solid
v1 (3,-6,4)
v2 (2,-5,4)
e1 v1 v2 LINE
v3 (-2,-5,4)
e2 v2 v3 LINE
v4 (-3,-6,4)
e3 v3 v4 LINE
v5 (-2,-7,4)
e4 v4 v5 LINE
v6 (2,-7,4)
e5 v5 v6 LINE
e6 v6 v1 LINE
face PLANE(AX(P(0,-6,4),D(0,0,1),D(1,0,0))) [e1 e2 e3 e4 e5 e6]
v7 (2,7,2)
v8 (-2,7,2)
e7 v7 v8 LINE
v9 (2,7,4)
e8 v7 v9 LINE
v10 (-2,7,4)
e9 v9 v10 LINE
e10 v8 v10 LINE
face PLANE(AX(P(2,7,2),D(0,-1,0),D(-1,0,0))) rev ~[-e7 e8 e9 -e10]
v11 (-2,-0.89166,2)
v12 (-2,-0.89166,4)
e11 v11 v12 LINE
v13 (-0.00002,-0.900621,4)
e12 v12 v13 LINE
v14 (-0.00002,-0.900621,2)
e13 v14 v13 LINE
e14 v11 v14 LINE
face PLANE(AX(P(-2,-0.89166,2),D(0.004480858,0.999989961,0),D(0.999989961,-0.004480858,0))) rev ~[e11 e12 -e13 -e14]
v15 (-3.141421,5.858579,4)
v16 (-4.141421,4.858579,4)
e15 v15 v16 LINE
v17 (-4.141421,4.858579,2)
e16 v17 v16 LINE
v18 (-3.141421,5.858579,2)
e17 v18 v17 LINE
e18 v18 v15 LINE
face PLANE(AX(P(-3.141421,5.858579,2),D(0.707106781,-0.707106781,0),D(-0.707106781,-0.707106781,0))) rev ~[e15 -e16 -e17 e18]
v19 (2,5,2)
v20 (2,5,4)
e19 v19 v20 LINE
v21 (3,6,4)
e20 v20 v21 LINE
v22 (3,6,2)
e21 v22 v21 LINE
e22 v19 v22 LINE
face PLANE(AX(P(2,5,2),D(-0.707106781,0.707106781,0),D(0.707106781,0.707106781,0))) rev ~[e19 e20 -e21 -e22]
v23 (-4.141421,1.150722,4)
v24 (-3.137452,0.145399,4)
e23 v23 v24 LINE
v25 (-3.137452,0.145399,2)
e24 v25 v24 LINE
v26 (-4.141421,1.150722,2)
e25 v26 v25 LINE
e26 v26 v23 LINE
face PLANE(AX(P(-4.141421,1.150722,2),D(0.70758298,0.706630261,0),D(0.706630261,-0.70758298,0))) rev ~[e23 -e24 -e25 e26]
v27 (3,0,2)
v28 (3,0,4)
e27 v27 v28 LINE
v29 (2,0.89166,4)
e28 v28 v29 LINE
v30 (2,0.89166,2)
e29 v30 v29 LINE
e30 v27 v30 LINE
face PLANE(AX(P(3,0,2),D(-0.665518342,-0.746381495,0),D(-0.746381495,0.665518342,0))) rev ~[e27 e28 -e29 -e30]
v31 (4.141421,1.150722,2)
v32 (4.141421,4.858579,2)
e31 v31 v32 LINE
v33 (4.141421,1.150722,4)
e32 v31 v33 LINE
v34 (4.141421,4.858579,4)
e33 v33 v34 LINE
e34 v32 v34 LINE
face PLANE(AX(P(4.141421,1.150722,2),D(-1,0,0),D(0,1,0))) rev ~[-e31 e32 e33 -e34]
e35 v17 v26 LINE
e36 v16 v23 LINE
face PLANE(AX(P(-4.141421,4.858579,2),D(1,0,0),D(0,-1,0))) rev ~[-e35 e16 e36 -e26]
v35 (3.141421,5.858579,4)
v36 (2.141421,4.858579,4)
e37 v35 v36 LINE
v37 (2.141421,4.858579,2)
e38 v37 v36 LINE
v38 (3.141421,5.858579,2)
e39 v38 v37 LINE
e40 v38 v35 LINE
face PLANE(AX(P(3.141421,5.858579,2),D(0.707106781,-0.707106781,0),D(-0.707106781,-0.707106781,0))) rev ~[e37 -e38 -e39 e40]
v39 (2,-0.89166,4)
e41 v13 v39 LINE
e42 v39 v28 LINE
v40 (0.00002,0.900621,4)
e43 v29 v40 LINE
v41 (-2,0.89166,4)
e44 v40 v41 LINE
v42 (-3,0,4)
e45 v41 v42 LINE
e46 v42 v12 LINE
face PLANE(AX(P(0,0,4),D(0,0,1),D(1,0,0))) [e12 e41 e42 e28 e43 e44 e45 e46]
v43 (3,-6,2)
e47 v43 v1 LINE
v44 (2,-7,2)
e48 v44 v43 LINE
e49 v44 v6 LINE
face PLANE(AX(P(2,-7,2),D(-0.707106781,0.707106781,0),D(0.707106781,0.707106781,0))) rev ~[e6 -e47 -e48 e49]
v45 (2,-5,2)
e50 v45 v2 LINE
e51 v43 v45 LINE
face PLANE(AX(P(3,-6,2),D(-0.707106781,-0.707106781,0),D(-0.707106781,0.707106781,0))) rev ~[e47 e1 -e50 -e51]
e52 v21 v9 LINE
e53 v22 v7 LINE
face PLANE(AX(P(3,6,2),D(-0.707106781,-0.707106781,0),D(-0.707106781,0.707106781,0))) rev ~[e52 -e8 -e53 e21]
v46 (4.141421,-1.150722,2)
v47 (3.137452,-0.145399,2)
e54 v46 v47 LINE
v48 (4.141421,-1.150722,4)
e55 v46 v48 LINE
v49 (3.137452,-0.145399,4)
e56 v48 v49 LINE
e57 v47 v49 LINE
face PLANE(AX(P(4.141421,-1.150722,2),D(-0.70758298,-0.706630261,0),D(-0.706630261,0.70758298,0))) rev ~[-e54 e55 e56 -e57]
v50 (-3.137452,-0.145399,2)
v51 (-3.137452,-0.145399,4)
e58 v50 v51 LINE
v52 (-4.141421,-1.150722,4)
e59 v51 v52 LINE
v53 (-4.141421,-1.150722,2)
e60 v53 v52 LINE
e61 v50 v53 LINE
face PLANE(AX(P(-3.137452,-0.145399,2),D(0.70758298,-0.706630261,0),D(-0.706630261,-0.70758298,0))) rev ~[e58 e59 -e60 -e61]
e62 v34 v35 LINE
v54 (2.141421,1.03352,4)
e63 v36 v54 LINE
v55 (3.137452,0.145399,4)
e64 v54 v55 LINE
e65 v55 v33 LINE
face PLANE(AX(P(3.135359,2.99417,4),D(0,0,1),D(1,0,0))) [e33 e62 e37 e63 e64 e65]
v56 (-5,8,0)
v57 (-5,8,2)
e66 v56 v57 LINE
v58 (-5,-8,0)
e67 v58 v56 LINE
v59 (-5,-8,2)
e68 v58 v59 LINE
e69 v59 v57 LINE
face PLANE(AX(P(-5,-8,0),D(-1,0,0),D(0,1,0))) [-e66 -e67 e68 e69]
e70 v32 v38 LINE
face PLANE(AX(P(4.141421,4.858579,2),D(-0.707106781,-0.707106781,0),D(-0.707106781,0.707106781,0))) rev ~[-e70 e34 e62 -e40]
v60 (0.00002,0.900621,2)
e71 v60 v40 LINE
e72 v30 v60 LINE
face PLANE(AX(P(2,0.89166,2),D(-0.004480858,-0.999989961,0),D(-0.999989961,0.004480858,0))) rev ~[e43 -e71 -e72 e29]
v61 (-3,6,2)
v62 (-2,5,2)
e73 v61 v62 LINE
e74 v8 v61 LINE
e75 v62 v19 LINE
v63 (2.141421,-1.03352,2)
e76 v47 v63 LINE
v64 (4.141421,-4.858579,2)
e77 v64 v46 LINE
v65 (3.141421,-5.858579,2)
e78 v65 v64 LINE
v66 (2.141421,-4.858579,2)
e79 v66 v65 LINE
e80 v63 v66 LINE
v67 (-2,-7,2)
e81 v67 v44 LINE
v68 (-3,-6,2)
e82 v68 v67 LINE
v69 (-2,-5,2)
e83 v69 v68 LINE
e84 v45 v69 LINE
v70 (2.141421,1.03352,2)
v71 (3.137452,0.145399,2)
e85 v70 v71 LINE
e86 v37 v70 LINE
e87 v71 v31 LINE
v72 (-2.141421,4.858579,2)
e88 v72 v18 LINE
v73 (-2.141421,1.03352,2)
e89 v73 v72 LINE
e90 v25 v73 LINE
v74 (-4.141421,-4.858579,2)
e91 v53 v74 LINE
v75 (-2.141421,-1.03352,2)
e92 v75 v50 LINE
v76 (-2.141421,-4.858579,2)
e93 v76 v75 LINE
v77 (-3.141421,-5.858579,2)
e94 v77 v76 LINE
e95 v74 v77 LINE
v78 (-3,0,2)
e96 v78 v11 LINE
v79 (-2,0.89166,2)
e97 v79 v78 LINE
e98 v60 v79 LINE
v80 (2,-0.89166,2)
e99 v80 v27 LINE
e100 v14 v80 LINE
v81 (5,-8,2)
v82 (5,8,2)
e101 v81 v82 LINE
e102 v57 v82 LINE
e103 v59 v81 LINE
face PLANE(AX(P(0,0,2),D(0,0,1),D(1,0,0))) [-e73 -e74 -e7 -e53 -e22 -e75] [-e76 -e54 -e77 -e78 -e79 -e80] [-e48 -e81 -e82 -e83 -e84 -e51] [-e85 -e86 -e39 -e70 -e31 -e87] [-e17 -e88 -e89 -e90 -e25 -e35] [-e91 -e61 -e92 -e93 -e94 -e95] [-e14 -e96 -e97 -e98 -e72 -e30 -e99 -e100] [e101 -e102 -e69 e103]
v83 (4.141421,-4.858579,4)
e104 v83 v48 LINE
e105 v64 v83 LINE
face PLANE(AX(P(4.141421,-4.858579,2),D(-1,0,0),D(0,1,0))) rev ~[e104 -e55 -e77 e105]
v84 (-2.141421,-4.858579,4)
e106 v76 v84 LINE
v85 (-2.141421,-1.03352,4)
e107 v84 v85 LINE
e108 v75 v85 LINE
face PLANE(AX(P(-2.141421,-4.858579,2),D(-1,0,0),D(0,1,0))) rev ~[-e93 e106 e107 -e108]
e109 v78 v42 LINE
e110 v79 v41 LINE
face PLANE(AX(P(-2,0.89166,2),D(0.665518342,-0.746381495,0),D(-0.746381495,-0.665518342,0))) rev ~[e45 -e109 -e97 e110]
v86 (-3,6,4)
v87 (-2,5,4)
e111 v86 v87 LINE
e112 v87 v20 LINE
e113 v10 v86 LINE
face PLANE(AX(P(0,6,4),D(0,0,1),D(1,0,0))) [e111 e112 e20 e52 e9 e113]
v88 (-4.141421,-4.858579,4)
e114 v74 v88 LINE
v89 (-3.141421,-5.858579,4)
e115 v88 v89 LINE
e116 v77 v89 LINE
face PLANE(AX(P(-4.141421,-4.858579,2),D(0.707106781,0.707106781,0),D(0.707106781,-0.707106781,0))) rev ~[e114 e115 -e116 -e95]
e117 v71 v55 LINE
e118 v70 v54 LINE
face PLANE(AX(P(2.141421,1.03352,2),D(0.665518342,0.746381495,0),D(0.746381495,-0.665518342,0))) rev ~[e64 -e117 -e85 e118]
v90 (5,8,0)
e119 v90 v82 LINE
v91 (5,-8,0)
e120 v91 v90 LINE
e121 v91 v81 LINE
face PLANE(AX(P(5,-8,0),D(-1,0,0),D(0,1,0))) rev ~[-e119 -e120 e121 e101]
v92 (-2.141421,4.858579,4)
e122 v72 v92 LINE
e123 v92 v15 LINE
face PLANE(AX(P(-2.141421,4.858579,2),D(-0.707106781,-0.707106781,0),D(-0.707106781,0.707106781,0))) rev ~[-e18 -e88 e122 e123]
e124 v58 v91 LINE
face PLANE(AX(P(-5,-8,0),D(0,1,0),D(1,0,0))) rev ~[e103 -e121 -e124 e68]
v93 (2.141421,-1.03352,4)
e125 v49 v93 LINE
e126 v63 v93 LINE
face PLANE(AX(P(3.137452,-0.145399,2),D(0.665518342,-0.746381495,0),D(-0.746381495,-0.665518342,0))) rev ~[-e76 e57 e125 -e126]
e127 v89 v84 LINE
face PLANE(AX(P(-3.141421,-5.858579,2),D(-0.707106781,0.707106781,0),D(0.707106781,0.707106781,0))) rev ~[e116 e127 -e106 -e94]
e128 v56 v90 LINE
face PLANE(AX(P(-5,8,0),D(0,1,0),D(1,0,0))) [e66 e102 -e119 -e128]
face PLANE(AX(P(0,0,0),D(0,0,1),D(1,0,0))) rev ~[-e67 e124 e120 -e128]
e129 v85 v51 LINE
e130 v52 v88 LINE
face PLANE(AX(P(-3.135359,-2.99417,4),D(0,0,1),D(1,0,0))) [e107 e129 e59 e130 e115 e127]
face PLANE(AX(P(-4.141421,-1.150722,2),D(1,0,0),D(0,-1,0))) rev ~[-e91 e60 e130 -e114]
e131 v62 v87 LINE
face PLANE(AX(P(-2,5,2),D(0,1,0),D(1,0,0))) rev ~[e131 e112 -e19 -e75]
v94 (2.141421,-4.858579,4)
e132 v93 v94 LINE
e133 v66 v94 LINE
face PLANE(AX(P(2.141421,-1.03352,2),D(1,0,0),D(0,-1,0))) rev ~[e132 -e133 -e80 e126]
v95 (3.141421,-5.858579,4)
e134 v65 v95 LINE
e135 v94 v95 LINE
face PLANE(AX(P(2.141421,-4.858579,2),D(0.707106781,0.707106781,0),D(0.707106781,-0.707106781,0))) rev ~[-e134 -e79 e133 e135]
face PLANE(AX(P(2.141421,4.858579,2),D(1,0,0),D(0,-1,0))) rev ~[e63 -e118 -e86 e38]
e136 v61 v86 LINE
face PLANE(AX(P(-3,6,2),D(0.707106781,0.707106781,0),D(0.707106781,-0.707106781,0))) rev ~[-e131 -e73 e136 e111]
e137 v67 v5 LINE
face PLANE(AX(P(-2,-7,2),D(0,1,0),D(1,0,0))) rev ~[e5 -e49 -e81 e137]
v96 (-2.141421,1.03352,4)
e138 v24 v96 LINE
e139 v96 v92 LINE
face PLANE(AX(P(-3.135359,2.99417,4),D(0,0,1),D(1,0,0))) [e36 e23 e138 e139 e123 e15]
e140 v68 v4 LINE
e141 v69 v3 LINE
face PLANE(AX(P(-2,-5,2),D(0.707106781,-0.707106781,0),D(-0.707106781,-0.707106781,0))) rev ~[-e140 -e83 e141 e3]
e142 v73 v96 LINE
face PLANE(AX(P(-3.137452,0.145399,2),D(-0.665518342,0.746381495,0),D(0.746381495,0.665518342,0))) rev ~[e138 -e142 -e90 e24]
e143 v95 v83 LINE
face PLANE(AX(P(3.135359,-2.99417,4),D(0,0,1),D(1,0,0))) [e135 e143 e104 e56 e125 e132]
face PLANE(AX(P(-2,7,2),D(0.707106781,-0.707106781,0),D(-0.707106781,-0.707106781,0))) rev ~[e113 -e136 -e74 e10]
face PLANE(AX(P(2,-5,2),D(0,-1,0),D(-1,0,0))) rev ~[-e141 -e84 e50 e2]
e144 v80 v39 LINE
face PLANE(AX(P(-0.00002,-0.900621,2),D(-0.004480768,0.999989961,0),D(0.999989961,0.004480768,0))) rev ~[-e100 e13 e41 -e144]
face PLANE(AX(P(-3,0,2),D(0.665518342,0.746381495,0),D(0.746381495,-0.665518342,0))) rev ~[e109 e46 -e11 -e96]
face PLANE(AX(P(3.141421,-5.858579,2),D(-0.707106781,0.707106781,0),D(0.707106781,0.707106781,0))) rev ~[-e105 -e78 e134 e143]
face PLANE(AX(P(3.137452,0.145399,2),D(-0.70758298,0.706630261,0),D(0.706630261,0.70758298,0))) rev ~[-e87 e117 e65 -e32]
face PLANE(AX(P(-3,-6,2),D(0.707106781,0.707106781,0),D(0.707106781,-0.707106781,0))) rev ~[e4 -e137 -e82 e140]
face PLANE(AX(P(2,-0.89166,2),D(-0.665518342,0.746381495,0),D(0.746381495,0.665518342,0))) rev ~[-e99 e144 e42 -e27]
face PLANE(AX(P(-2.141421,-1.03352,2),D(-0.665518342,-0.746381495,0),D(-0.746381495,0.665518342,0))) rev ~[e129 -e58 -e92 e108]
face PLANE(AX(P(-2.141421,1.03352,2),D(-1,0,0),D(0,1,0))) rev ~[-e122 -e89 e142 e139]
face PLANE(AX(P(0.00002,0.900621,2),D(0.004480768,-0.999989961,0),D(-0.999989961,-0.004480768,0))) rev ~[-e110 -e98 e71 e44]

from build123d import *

# Parameters (mm, degrees)
F0_W     = 10
F0_H     = 16
F1_DEPTH = 2
F3_DEPTH = 2


# Not quite as in the source:
# - ends of sketch curves that miss each other by under 0.0002 mm in the source are joined


with BuildPart() as f1:
    # F0 (on Top) → F1 (new body)
    with BuildSketch(Plane.XY):
        Rectangle(F0_W, F0_H)
    extrude(amount=F1_DEPTH)

    # F2 (on face) → F3 (join)
    with BuildSketch(Plane.XY.offset(2)):
        Polygon((0, 7), (-2, 7), (-3, 6), (-2, 5), (0, 5), (2, 5), (3, 6), (2, 7), align=None)
        Polygon((-2.1414213562, 4.8585786438), (-3.1414213562, 5.8585786438), (-4.1414213562, 4.8585786438), (-4.1414213562, 1.1507223826), (-3.1374518146, 0.1453992321), (-2.1414213562, 1.0335195075), align=None)
        Polygon((2, 0.891659756), (2.00782e-05, 0.9006214721), (-2, 0.891659756), (-3, 0), (-2, -0.891659756), (-2.00782e-05, -0.9006214721), (2, -0.891659756), (3, 0), align=None)
        Polygon((0, -5), (-2, -5), (-3, -6), (-2, -7), (0, -7), (2, -7), (3, -6), (2, -5), align=None)
        Polygon((-4.1414213562, -4.8585786438), (-3.1414213562, -5.8585786438), (-2.1414213562, -4.8585786438), (-2.1414213562, -1.0335195075), (-3.1374518146, -0.1453992321), (-4.1414213562, -1.1507223826), align=None)
        Polygon((4.1414213562, 4.8585786438), (3.1414213562, 5.8585786438), (2.1414213562, 4.8585786438), (2.1414213562, 1.0335195075), (3.1374518146, 0.1453992321), (4.1414213562, 1.1507223826), align=None)
        Polygon((3.1374518146, -0.1453992321), (2.1414213562, -1.0335195075), (2.1414213562, -4.8585786438), (3.1414213562, -5.8585786438), (4.1414213562, -4.8585786438), (4.1414213562, -1.1507223826), align=None)
    extrude(amount=F3_DEPTH)


solid = f1.part
